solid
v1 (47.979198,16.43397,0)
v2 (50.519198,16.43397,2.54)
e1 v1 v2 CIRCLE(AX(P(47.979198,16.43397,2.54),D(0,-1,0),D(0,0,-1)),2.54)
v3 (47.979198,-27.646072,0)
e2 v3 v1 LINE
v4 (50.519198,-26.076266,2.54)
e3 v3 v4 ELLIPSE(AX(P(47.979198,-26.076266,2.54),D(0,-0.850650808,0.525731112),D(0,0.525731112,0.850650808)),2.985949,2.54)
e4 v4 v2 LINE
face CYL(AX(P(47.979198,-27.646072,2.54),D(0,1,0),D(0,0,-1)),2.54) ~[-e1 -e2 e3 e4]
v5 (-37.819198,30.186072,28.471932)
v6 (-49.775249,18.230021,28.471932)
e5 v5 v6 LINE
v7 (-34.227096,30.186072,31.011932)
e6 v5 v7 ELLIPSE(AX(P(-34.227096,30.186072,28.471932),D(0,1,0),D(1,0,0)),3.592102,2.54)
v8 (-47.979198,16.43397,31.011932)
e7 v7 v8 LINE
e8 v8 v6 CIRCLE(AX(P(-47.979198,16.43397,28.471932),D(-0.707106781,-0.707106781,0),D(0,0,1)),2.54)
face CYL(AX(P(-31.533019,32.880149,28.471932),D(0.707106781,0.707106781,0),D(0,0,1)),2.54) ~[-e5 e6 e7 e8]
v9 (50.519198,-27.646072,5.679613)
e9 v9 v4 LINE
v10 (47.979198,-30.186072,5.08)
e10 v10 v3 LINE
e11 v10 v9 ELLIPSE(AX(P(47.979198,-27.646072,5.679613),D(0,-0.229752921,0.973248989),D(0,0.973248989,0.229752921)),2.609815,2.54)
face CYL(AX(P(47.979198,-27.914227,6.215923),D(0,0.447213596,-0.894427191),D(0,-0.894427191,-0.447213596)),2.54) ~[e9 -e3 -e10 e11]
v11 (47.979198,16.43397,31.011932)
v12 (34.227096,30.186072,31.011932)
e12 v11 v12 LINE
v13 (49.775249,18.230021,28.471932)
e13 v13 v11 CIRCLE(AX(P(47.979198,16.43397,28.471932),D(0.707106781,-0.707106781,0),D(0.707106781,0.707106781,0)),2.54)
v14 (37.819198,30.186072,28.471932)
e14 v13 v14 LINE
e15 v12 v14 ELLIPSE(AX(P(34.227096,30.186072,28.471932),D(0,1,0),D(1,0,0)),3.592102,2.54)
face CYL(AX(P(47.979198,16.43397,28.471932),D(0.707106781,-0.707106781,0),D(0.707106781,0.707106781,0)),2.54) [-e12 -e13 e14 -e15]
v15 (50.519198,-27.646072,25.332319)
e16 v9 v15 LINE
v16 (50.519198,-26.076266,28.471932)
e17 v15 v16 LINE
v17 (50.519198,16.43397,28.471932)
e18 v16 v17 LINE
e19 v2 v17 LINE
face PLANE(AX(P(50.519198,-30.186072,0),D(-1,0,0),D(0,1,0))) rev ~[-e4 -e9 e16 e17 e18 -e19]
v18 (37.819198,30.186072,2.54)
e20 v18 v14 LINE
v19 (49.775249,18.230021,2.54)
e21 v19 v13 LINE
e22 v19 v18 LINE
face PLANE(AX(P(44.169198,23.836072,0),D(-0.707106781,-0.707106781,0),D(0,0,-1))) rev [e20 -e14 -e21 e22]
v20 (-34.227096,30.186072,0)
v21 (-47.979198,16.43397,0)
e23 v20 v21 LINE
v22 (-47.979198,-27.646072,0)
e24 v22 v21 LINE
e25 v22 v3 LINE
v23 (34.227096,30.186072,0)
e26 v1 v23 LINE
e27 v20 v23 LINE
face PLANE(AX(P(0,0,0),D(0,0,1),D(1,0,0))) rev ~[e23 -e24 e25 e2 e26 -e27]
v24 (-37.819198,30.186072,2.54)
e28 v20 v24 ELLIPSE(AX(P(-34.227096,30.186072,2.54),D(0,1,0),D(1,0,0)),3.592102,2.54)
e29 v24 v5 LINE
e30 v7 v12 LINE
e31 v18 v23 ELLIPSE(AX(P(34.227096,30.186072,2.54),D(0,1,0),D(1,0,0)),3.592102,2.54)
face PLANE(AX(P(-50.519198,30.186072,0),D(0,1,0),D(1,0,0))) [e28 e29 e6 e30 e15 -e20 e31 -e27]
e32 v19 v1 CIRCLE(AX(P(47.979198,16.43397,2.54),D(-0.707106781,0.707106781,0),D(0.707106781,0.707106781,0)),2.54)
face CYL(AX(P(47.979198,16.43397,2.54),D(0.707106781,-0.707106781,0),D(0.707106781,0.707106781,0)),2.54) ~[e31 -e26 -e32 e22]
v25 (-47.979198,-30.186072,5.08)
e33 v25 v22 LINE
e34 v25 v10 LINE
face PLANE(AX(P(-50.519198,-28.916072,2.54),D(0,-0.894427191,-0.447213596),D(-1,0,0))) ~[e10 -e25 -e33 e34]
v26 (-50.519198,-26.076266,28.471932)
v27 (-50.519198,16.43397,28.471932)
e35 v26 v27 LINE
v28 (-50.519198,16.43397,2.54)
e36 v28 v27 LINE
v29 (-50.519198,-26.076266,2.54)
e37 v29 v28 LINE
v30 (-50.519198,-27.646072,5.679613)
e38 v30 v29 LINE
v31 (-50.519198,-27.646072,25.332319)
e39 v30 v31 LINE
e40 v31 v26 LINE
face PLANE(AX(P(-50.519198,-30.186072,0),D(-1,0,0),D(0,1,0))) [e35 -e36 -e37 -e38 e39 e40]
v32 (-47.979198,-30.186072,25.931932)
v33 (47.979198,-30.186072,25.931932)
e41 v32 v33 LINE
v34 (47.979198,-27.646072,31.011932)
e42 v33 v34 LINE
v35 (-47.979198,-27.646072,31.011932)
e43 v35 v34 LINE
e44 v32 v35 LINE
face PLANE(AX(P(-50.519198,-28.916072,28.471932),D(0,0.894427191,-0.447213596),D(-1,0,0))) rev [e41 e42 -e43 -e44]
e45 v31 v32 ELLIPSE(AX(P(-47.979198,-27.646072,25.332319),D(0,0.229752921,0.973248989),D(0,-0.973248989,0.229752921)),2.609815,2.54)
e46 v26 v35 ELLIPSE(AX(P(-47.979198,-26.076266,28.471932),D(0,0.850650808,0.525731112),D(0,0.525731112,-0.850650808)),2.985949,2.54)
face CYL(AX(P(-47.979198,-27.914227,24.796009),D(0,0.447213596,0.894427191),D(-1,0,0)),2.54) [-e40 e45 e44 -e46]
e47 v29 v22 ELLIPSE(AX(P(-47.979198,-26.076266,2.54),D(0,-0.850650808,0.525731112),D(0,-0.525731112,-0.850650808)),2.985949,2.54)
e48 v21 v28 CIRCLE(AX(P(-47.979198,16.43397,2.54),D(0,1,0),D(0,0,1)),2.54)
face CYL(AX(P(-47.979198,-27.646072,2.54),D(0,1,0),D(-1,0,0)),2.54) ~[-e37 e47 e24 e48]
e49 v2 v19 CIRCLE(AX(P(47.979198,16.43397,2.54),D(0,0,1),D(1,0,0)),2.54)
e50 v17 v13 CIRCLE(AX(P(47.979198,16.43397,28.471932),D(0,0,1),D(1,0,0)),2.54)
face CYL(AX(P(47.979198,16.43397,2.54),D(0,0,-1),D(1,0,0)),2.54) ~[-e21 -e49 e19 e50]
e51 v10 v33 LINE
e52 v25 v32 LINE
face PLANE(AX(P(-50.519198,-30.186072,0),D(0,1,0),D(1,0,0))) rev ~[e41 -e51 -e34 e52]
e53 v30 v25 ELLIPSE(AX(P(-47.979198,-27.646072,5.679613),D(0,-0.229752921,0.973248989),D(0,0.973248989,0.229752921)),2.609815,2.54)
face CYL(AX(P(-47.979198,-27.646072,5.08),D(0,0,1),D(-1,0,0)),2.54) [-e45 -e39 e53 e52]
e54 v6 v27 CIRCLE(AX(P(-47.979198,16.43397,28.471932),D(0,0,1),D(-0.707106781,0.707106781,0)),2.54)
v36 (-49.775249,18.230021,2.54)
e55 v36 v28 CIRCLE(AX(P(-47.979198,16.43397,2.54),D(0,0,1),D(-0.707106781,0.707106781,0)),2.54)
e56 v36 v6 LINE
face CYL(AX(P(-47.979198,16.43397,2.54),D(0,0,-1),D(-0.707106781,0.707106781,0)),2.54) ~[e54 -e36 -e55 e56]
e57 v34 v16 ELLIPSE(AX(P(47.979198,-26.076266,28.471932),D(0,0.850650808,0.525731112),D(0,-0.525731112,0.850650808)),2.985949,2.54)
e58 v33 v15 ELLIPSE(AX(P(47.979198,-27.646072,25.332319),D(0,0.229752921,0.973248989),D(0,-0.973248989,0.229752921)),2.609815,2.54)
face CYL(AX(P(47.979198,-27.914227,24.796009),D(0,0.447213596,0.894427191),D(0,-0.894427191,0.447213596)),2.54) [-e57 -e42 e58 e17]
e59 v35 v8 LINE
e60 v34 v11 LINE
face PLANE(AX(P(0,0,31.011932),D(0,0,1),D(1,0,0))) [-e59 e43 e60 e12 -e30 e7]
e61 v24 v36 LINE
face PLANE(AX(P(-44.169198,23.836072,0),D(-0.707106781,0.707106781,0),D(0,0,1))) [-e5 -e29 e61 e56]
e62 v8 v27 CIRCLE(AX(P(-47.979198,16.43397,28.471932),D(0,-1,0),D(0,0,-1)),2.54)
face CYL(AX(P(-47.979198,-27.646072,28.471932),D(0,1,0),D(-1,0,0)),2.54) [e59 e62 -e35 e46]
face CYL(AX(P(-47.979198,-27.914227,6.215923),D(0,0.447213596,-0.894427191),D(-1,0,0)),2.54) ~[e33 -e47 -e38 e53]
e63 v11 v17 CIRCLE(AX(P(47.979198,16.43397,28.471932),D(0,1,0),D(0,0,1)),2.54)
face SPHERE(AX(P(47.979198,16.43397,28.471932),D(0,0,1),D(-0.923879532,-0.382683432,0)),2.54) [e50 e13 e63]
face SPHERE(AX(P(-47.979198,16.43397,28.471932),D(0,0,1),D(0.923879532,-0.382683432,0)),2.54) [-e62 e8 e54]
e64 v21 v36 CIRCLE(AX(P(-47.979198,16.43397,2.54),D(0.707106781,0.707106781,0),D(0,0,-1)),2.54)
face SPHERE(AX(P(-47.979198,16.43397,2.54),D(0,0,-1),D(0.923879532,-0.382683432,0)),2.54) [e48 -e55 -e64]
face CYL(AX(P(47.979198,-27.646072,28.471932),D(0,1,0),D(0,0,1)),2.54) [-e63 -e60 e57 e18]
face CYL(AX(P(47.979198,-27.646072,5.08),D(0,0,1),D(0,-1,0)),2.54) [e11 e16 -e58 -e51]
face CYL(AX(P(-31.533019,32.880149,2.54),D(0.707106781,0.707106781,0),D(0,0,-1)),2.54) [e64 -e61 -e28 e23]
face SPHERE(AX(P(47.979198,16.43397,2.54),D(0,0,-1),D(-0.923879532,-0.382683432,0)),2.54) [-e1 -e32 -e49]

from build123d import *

# Parameters (mm, degrees)
F0_W         = 101.0383963585
F0_H         = 60.3721439838
F1_DEPTH     = 31.0119315982
F3_SIZE2     = 2.54
F3_SIZE      = 5.08
F4_SIZE      = 12.7
F5_R         = 2.54
F6_T1_DEPTH  = 23.2584097937
F6_T3_DEPTH  = 23.2584097937
F6_T5_DEPTH  = 25.9319315982
F6_T10_DEPTH = 2.54
F6_T16_DEPTH = 2.54
F6_T22_DEPTH = 2.54
F6_T28_DEPTH = 2.54


# Not quite as in the source:
# - a fillet or chamfer that OpenCascade refuses, or shapes differently, is made with other operations: its cross-section is extruded or revolved along the edge and cut away or added


with BuildPart() as f1:
    # F0 (on Top) → F1 (new body)
    with BuildSketch(Plane.XY):
        Rectangle(F0_W, F0_H)
    extrude(amount=F1_DEPTH)

    # F3
    f3_edges = [f1.edges().sort_by_distance(p)[0] for p in [
        (0, -30.186072, 31.011932),
        (0, -30.186072, 0),
    ]]
    f3_side = f1.faces().sort_by_distance((0, -30.186072, 15.505966))[0]
    chamfer(f3_edges, length=F3_SIZE, length2=F3_SIZE2, reference=f3_side)

    # F4
    f4_edges = [f1.edges().sort_by_distance(p)[0] for p in [
        (50.519198, 30.186072, 15.505966),
        (-50.519198, 30.186072, 15.505966),
    ]]
    chamfer(f4_edges, length=F4_SIZE)

    # F5
    f5_edges = [f1.edges().sort_by_distance(p)[0] for p in [
        (50.519198, -30.186072, 15.505966),
        (50.519198, -28.916072, 28.471932),
        (50.519198, -5.08, 31.011932),
        (50.519198, -5.08, 0),
        (50.519198, -28.916072, 2.54),
        (-50.519198, -5.08, 31.011932),
        (-50.519198, -30.186072, 15.505966),
        (-50.519198, -28.916072, 28.471932),
        (-50.519198, -28.916072, 2.54),
        (-50.519198, -5.08, 0),
    ]]
    fillet(f5_edges, radius=F5_R)

    # F6: fillet of radius 2.54 on 6 edges, made by hand

    # F6_s2 → F6_t1 (cut)
    with BuildSketch(Plane(origin=(15.7726143179, -15.7726143179, 0), x_dir=(0, 0, 1), z_dir=(-0.7071067812, 0.7071067812, 0))):
        with BuildLine():
            ThreePointArc((28.4719315982, 48.0869876945), (30.2679828224, 47.3430389187), (31.0119315982, 45.5469876945))
            Line((31.0119315982, 45.5469876945), (31.0119315982, 48.0869876945))
            Line((31.0119315982, 48.0869876945), (28.4719315982, 48.0869876945))
        make_face()
        with BuildLine():
            ThreePointArc((2.54, 48.0869876945), (0.7439487758, 47.3430389187), (0, 45.5469876945))
            Line((0, 45.5469876945), (0, 48.0869876945))
            Line((0, 48.0869876945), (2.54, 48.0869876945))
        make_face()
    extrude(amount=F6_T1_DEPTH, mode=Mode.SUBTRACT)

    # F6_s4 → F6_t3 (cut)
    with BuildSketch(Plane(origin=(0.6735649669, 0.6735649669, 0), x_dir=(0, 0, 1), z_dir=(-0.7071067812, -0.7071067812, 0))):
        with BuildLine():
            ThreePointArc((31.0119315982, 45.5469876945), (30.2679828224, 47.3430389187), (28.4719315982, 48.0869876945))
            Line((28.4719315982, 48.0869876945), (31.0119315982, 48.0869876945))
            Line((31.0119315982, 48.0869876945), (31.0119315982, 45.5469876945))
        make_face()
        with BuildLine():
            ThreePointArc((0, 45.5469876945), (0.7439487758, 47.3430389187), (2.54, 48.0869876945))
            Line((2.54, 48.0869876945), (0, 48.0869876945))
            Line((0, 48.0869876945), (0, 45.5469876945))
        make_face()
    extrude(amount=F6_T3_DEPTH, mode=Mode.SUBTRACT)

    # F6_s6 → F6_t5 (cut)
    with BuildSketch(Plane.XY.offset(2.54)):
        with BuildLine():
            ThreePointArc((50.5191981792, 16.4339695435), (50.3258521918, 17.4059854617), (49.7752494035, 18.2300207677))
            Line((49.7752494035, 18.2300207677), (50.5191981792, 17.4860719919))
            Line((50.5191981792, 17.4860719919), (50.5191981792, 16.4339695435))
        make_face()
        with BuildLine():
            ThreePointArc((-49.7752494035, 18.2300207677), (-50.3258521918, 17.4059854617), (-50.5191981792, 16.4339695435))
            Line((-50.5191981792, 16.4339695435), (-50.5191981792, 17.4860719919))
            Line((-50.5191981792, 17.4860719919), (-49.7752494035, 18.2300207677))
        make_face()
    extrude(amount=F6_T5_DEPTH, mode=Mode.SUBTRACT)


with BuildPart() as f6_tool8:
    # F6_s9 → F6_t10 (new body)
    with BuildSketch(Plane.XY.offset(2.54)):
        Polygon((-47.9791981792, 16.4339695435), (-50.5191981792, 16.4339695435), (-50.5191981792, 17.4860719919), (-49.7752494035, 18.2300207677), align=None)
    extrude(amount=-F6_T10_DEPTH)

    # F6_s11 → F6_t12 (revolve, cut)
    with BuildSketch(Plane(origin=(-47.9791981792, 16.4339695435, 2.54), x_dir=(0.9238795325, -0.3826834324, 0), z_dir=(0.3826834324, 0.9238795325, 0))):
        with BuildLine():
            ThreePointArc((0, -2.54), (2.54, 0), (0, 2.54))
            Line((0, 2.54), (0, -2.54))
        make_face()
    revolve(axis=Axis((-47.9791981792, 16.4339695435, 2.54), (0, 0, -1)), mode=Mode.SUBTRACT)


with BuildPart() as f1_1:
    add(f1.part)

    # F6_t7: cut F6_tool8
    add(f6_tool8.part, mode=Mode.SUBTRACT)


with BuildPart() as f6_tool14:
    # F6_s15 → F6_t16 (new body)
    with BuildSketch(Plane.XY.offset(28.4719315982)):
        Polygon((-47.9791981792, 16.4339695435), (-50.5191981792, 16.4339695435), (-50.5191981792, 17.4860719919), (-49.7752494035, 18.2300207677), align=None)
    extrude(amount=F6_T16_DEPTH)

    # F6_s17 → F6_t18 (revolve, cut)
    with BuildSketch(Plane(origin=(-47.9791981792, 16.4339695435, 28.4719315982), x_dir=(0.9238795325, -0.3826834324, 0), z_dir=(-0.3826834324, -0.9238795325, 0))):
        with BuildLine():
            ThreePointArc((0, -2.54), (2.54, 0), (0, 2.54))
            Line((0, 2.54), (0, -2.54))
        make_face()
    revolve(axis=Axis((-47.9791981792, 16.4339695435, 28.4719315982), (0, 0, 1)), mode=Mode.SUBTRACT)


with BuildPart() as f1_2:
    add(f1_1.part)

    # F6_t13: cut F6_tool14
    add(f6_tool14.part, mode=Mode.SUBTRACT)


with BuildPart() as f6_tool20:
    # F6_s21 → F6_t22 (new body)
    with BuildSketch(Plane.XY.offset(2.54)):
        Polygon((47.9791981792, 16.4339695435), (50.5191981792, 16.4339695435), (50.5191981792, 17.4860719919), (49.7752494035, 18.2300207677), align=None)
    extrude(amount=-F6_T22_DEPTH)

    # F6_s23 → F6_t24 (revolve, cut)
    with BuildSketch(Plane(origin=(47.9791981792, 16.4339695435, 2.54), x_dir=(-0.9238795325, -0.3826834324, 0), z_dir=(0.3826834324, -0.9238795325, 0))):
        with BuildLine():
            ThreePointArc((0, -2.54), (2.54, 0), (0, 2.54))
            Line((0, 2.54), (0, -2.54))
        make_face()
    revolve(axis=Axis((47.9791981792, 16.4339695435, 2.54), (0, 0, -1)), mode=Mode.SUBTRACT)


with BuildPart() as f1_3:
    add(f1_2.part)

    # F6_t19: cut F6_tool20
    add(f6_tool20.part, mode=Mode.SUBTRACT)


with BuildPart() as f6_tool26:
    # F6_s27 → F6_t28 (new body)
    with BuildSketch(Plane.XY.offset(28.4719315982)):
        Polygon((47.9791981792, 16.4339695435), (50.5191981792, 16.4339695435), (50.5191981792, 17.4860719919), (49.7752494035, 18.2300207677), align=None)
    extrude(amount=F6_T28_DEPTH)

    # F6_s29 → F6_t30 (revolve, cut)
    with BuildSketch(Plane(origin=(47.9791981792, 16.4339695435, 28.4719315982), x_dir=(-0.9238795325, -0.3826834324, 0), z_dir=(-0.3826834324, 0.9238795325, 0))):
        with BuildLine():
            ThreePointArc((0, -2.54), (2.54, 0), (0, 2.54))
            Line((0, 2.54), (0, -2.54))
        make_face()
    revolve(axis=Axis((47.9791981792, 16.4339695435, 28.4719315982), (0, 0, 1)), mode=Mode.SUBTRACT)


with BuildPart() as f1_4:
    add(f1_3.part)

    # F6_t25: cut F6_tool26
    add(f6_tool26.part, mode=Mode.SUBTRACT)


solid = f1_4.part
